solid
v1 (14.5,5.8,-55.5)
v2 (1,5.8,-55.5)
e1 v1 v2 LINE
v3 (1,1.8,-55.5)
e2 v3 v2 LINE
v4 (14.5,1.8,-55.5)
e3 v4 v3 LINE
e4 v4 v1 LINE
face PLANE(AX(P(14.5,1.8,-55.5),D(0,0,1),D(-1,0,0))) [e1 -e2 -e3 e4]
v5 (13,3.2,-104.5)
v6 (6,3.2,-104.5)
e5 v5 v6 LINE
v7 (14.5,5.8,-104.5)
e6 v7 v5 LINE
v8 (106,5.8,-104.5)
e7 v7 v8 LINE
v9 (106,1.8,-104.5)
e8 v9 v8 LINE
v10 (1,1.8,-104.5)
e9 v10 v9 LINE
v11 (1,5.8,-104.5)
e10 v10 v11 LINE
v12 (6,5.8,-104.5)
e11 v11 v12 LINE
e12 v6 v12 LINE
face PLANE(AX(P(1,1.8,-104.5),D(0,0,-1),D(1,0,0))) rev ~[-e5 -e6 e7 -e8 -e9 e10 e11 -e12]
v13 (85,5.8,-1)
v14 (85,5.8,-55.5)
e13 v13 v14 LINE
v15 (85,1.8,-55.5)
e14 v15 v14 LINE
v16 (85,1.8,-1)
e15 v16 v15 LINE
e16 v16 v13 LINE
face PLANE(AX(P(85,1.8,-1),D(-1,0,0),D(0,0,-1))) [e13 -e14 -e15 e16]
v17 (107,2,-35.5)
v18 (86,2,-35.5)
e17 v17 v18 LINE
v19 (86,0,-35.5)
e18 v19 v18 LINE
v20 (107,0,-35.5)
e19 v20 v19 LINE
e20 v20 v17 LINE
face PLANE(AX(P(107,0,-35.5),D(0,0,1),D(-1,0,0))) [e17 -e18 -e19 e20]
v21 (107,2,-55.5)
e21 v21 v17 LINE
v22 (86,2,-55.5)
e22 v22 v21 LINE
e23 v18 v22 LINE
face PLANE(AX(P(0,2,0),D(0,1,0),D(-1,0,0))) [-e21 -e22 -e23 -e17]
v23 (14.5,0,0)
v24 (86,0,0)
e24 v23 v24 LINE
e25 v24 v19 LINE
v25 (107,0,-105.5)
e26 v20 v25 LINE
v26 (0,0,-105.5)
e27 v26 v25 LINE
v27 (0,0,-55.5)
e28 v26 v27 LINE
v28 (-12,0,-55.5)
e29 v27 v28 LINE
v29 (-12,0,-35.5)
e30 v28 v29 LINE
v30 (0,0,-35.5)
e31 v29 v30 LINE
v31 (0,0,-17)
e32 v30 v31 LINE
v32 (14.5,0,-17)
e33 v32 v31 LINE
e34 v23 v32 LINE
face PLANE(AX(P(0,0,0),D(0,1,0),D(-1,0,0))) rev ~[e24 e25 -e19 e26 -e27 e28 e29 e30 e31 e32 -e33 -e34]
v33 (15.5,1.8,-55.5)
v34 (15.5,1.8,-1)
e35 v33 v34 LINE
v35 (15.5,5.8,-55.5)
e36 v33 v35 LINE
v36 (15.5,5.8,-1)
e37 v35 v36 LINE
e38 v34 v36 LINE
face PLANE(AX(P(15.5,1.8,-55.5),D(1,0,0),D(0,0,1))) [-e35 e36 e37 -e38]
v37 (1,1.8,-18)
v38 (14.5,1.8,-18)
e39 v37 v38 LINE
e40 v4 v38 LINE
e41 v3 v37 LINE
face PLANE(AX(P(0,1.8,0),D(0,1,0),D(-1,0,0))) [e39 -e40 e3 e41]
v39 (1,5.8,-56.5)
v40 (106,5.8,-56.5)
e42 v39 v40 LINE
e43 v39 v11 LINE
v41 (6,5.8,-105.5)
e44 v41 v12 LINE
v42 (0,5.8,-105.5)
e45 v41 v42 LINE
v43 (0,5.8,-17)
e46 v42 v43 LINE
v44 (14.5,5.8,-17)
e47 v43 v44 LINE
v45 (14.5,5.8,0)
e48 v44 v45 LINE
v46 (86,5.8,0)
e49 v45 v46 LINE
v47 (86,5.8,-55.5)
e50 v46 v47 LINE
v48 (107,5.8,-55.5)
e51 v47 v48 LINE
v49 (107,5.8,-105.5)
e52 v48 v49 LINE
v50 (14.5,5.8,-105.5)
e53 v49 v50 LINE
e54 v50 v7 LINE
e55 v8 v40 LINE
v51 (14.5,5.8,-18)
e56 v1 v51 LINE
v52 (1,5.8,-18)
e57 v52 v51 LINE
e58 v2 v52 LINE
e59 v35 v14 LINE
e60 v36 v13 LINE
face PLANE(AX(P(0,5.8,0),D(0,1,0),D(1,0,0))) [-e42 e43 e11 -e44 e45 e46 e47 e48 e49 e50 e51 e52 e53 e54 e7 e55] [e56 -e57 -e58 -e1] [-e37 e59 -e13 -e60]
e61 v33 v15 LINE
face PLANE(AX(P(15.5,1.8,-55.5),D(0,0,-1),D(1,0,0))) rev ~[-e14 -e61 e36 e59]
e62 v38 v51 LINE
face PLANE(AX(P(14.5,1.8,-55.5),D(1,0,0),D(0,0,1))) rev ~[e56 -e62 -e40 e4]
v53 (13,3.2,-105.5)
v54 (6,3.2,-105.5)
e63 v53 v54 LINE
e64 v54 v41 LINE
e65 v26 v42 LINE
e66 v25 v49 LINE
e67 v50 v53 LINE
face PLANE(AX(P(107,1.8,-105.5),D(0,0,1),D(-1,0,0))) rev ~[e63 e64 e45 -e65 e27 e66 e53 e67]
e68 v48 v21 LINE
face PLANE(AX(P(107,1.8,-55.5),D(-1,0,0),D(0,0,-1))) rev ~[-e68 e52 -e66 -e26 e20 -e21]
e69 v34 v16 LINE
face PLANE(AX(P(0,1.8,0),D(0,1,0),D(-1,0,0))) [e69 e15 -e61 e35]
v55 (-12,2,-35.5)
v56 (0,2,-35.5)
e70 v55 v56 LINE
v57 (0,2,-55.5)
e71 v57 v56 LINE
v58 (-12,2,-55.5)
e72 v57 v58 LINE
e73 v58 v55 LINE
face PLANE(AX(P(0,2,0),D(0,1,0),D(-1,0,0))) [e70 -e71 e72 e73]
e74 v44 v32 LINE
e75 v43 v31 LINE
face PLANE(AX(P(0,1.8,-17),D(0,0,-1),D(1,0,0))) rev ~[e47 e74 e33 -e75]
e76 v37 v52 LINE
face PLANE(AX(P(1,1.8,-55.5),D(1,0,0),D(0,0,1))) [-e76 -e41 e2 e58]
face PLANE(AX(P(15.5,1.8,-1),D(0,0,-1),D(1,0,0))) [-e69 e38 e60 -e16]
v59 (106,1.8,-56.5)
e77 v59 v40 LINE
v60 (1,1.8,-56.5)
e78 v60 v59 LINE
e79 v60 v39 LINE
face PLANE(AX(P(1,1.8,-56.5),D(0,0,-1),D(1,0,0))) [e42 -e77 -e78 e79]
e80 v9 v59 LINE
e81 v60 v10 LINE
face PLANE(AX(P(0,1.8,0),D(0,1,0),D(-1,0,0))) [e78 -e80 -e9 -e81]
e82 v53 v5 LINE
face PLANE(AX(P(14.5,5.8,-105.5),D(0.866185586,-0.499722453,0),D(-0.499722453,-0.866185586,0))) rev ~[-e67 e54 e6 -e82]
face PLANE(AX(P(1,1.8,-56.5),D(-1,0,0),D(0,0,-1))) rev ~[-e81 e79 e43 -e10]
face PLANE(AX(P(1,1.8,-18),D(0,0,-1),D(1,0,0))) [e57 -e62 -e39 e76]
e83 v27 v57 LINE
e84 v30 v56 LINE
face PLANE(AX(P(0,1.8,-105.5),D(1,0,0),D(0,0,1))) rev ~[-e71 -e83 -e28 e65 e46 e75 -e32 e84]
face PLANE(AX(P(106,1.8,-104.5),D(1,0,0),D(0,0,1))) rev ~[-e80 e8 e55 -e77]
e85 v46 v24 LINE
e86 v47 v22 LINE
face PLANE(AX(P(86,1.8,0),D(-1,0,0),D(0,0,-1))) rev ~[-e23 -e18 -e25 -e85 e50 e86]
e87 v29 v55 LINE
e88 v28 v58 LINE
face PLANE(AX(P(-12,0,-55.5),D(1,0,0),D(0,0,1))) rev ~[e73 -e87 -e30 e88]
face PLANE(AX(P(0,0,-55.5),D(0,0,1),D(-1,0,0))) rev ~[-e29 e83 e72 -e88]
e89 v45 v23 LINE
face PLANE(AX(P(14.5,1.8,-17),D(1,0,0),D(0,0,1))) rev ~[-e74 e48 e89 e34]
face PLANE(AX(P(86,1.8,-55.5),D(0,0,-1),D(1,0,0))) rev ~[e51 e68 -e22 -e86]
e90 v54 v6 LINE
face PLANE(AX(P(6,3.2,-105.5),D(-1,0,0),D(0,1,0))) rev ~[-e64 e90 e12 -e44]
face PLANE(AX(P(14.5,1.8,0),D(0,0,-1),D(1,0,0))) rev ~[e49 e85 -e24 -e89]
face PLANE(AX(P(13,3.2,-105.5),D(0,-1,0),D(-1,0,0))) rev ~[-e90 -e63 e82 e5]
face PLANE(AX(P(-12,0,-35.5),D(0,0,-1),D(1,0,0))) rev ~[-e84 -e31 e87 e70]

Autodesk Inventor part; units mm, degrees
sketch "Náčrt1" plane through (0, 0, 0) normal (0, 1, 0) x (-1, 0, 0)
  line L0 (0, 0) -> (-86, 0)
  line L1 (-86, 0) -> (-86, -55.5)
  line L2 (-86, -55.5) -> (0, -55.5)
  line L3 (0, -55.5) -> (0, 0)
  line L4 (0, -55.5) -> (0, -105.5)
  line L5 (0, -105.5) -> (-107, -105.5)
  line L6 (-107, -105.5) -> (-107, -55.5)
  line L7 (-107, -55.5) -> (-86, -55.5)
  dimension "d0" = 86
  dimension "d1" = 55.5
  dimension "d2" = 90
  dimension "d3" = 50
  dimension "d4" = 107
extrude "Vysunutí1" add sketch "Náčrt1" along normal blind 1.8
sketch "Náčrt2" plane through (0, 1.8, 0) normal (0, 1, 0) x (1, 0, 0)
  line L0 (107, 105.5) -> (0, 105.5) projected
  line L1 (107, 55.5) -> (107, 105.5) projected
  line L2 (86, 55.5) -> (107, 55.5) projected
  line L3 (86, 0) -> (86, 55.5) projected
  line L4 (0, 0) -> (86, 0) projected
  line L5 (0, 105.5) -> (0, 0) projected
  line L6 (85, 1) -> (85, 55.5)
  line L7 (14.5, 55.5) -> (14.5, 0)
  line L8 (15.5, 55.5) -> (85, 55.5)
  line L9 (1, 56.5) -> (106, 56.5)
  line L10 (1, 56.5) -> (1, 104.5)
  line L11 (1, 104.5) -> (106, 104.5)
  line L12 (106, 104.5) -> (106, 56.5)
  line L13 (15.5, 1) -> (85, 1)
  line L14 (15.5, 55.5) -> (15.5, 1)
  line L15 (14.5, 55.5) -> (1, 55.5)
  line L16 (1, 55.5) -> (1, 18)
  line L17 (1, 18) -> (14.5, 18)
  line L18 (0, 17) -> (14.5, 17)
  dimension "d21" = 14.5
  dimension "d22" = 1
  dimension "d23" = 1
  dimension "d24" = 48
  dimension "d25" = 105
  dimension "d28" = 1
  dimension "d29" = 37.5
  dimension "d30" = 1
  dimension "d31" = 1
  dimension "d45" = 1
  dimension "d46" = 1
  dimension "d47" = 1
  dimension "d48" = 54.5
  dimension "d49" = 1
  dimension "d50" = 1
  dimension "d51" = 69.5
extrude "Vysunutí3" add sketch "Náčrt2" along normal blind 4 contours L1 L2 L3 L4 L7 L18 L5 L0
sketch "Náčrt3" plane through (0, 1.8, 0) normal (0, 1, 0) x (1, 0, 0)
  line L0 (14.5, 17) -> (0, 17) projected
  line L1 (0, 17) -> (0, 0) projected
  line L2 (0, 0) -> (14.5, 0) projected
  line L3 (14.5, 0) -> (14.5, 17) projected
extrude "Vysunutí4" cut sketch "Náčrt3" against normal blind 4
sketch "Náčrt4" plane through (107, 0, -105.5) normal (0, 0, -1) x (-1, 0, 0)
  line L0 (101, 3.2) -> (94, 3.2)
  line L1 (101, 3.2) -> (101, 5.8)
  line L2 (101, 3.2) -> (103.6, 3.2) construction
  line L3 (94, 5.8) -> (94, 3.2)
  line L4 (0, 5.8) -> (107, 5.8) projected
  line L5 (107, 0) -> (107, 5.8) projected
  line L6 (106, 5.8) -> (92.5, 5.8) projected
  line L7 (101, 5.8) -> (92.5, 5.8)
  dimension "d37" = 7
  dimension "d39" = 90
  dimension "d41" = 6
  dimension "d42" = 3.6
sketch "Náčrt4 outline for Vysunutí5" plane through (107, 0, -105.5) normal (0, 0, -1) x (-1, 0, 0)
  line L0 (94, 3.2) -> (101, 3.2)
  line L1 (92.5, 5.8) -> (94, 3.2)
  line L2 (101, 5.8) -> (92.5, 5.8)
  line L3 (101, 3.2) -> (101, 5.8)
extrude "Vysunutí5" cut sketch "Náčrt4 outline for Vysunutí5" against normal blind 4
sketch "Sketch5" plane through (0, 0, 0) normal (0, 1, 0) x (-1, 0, 0)
  line L0 (-86, -55.5) -> (-107, -55.5) projected
  line L1 (-107, -55.5) -> (-107, -35.5)
  line L2 (-107, -35.5) -> (-86, -35.5)
  line L3 (-86, 0) -> (-86, -55.5) projected
  line L4 (0, -105.5) -> (0, -17) projected
  line L5 (0, -55.5) -> (12, -55.5)
  line L6 (12, -55.5) -> (12, -35.5)
  line L7 (12, -35.5) -> (0, -35.5)
  line L8 (0, -35.5) -> (0, -55.5)
  line L9 (-1, -55.5) -> (-14.5, -55.5) projected
  line L10 (0, -17) -> (-14.5, -17) projected
  point P0 (0, 0)
  dimension "d52" = 20
  dimension "d53" = 12
  dimension "d54" = 20
  dimension "d55" = 18.5
extrude "Extrusion6" add sketch "Sketch5" along normal blind 2
properties part number "Entrance_System"
